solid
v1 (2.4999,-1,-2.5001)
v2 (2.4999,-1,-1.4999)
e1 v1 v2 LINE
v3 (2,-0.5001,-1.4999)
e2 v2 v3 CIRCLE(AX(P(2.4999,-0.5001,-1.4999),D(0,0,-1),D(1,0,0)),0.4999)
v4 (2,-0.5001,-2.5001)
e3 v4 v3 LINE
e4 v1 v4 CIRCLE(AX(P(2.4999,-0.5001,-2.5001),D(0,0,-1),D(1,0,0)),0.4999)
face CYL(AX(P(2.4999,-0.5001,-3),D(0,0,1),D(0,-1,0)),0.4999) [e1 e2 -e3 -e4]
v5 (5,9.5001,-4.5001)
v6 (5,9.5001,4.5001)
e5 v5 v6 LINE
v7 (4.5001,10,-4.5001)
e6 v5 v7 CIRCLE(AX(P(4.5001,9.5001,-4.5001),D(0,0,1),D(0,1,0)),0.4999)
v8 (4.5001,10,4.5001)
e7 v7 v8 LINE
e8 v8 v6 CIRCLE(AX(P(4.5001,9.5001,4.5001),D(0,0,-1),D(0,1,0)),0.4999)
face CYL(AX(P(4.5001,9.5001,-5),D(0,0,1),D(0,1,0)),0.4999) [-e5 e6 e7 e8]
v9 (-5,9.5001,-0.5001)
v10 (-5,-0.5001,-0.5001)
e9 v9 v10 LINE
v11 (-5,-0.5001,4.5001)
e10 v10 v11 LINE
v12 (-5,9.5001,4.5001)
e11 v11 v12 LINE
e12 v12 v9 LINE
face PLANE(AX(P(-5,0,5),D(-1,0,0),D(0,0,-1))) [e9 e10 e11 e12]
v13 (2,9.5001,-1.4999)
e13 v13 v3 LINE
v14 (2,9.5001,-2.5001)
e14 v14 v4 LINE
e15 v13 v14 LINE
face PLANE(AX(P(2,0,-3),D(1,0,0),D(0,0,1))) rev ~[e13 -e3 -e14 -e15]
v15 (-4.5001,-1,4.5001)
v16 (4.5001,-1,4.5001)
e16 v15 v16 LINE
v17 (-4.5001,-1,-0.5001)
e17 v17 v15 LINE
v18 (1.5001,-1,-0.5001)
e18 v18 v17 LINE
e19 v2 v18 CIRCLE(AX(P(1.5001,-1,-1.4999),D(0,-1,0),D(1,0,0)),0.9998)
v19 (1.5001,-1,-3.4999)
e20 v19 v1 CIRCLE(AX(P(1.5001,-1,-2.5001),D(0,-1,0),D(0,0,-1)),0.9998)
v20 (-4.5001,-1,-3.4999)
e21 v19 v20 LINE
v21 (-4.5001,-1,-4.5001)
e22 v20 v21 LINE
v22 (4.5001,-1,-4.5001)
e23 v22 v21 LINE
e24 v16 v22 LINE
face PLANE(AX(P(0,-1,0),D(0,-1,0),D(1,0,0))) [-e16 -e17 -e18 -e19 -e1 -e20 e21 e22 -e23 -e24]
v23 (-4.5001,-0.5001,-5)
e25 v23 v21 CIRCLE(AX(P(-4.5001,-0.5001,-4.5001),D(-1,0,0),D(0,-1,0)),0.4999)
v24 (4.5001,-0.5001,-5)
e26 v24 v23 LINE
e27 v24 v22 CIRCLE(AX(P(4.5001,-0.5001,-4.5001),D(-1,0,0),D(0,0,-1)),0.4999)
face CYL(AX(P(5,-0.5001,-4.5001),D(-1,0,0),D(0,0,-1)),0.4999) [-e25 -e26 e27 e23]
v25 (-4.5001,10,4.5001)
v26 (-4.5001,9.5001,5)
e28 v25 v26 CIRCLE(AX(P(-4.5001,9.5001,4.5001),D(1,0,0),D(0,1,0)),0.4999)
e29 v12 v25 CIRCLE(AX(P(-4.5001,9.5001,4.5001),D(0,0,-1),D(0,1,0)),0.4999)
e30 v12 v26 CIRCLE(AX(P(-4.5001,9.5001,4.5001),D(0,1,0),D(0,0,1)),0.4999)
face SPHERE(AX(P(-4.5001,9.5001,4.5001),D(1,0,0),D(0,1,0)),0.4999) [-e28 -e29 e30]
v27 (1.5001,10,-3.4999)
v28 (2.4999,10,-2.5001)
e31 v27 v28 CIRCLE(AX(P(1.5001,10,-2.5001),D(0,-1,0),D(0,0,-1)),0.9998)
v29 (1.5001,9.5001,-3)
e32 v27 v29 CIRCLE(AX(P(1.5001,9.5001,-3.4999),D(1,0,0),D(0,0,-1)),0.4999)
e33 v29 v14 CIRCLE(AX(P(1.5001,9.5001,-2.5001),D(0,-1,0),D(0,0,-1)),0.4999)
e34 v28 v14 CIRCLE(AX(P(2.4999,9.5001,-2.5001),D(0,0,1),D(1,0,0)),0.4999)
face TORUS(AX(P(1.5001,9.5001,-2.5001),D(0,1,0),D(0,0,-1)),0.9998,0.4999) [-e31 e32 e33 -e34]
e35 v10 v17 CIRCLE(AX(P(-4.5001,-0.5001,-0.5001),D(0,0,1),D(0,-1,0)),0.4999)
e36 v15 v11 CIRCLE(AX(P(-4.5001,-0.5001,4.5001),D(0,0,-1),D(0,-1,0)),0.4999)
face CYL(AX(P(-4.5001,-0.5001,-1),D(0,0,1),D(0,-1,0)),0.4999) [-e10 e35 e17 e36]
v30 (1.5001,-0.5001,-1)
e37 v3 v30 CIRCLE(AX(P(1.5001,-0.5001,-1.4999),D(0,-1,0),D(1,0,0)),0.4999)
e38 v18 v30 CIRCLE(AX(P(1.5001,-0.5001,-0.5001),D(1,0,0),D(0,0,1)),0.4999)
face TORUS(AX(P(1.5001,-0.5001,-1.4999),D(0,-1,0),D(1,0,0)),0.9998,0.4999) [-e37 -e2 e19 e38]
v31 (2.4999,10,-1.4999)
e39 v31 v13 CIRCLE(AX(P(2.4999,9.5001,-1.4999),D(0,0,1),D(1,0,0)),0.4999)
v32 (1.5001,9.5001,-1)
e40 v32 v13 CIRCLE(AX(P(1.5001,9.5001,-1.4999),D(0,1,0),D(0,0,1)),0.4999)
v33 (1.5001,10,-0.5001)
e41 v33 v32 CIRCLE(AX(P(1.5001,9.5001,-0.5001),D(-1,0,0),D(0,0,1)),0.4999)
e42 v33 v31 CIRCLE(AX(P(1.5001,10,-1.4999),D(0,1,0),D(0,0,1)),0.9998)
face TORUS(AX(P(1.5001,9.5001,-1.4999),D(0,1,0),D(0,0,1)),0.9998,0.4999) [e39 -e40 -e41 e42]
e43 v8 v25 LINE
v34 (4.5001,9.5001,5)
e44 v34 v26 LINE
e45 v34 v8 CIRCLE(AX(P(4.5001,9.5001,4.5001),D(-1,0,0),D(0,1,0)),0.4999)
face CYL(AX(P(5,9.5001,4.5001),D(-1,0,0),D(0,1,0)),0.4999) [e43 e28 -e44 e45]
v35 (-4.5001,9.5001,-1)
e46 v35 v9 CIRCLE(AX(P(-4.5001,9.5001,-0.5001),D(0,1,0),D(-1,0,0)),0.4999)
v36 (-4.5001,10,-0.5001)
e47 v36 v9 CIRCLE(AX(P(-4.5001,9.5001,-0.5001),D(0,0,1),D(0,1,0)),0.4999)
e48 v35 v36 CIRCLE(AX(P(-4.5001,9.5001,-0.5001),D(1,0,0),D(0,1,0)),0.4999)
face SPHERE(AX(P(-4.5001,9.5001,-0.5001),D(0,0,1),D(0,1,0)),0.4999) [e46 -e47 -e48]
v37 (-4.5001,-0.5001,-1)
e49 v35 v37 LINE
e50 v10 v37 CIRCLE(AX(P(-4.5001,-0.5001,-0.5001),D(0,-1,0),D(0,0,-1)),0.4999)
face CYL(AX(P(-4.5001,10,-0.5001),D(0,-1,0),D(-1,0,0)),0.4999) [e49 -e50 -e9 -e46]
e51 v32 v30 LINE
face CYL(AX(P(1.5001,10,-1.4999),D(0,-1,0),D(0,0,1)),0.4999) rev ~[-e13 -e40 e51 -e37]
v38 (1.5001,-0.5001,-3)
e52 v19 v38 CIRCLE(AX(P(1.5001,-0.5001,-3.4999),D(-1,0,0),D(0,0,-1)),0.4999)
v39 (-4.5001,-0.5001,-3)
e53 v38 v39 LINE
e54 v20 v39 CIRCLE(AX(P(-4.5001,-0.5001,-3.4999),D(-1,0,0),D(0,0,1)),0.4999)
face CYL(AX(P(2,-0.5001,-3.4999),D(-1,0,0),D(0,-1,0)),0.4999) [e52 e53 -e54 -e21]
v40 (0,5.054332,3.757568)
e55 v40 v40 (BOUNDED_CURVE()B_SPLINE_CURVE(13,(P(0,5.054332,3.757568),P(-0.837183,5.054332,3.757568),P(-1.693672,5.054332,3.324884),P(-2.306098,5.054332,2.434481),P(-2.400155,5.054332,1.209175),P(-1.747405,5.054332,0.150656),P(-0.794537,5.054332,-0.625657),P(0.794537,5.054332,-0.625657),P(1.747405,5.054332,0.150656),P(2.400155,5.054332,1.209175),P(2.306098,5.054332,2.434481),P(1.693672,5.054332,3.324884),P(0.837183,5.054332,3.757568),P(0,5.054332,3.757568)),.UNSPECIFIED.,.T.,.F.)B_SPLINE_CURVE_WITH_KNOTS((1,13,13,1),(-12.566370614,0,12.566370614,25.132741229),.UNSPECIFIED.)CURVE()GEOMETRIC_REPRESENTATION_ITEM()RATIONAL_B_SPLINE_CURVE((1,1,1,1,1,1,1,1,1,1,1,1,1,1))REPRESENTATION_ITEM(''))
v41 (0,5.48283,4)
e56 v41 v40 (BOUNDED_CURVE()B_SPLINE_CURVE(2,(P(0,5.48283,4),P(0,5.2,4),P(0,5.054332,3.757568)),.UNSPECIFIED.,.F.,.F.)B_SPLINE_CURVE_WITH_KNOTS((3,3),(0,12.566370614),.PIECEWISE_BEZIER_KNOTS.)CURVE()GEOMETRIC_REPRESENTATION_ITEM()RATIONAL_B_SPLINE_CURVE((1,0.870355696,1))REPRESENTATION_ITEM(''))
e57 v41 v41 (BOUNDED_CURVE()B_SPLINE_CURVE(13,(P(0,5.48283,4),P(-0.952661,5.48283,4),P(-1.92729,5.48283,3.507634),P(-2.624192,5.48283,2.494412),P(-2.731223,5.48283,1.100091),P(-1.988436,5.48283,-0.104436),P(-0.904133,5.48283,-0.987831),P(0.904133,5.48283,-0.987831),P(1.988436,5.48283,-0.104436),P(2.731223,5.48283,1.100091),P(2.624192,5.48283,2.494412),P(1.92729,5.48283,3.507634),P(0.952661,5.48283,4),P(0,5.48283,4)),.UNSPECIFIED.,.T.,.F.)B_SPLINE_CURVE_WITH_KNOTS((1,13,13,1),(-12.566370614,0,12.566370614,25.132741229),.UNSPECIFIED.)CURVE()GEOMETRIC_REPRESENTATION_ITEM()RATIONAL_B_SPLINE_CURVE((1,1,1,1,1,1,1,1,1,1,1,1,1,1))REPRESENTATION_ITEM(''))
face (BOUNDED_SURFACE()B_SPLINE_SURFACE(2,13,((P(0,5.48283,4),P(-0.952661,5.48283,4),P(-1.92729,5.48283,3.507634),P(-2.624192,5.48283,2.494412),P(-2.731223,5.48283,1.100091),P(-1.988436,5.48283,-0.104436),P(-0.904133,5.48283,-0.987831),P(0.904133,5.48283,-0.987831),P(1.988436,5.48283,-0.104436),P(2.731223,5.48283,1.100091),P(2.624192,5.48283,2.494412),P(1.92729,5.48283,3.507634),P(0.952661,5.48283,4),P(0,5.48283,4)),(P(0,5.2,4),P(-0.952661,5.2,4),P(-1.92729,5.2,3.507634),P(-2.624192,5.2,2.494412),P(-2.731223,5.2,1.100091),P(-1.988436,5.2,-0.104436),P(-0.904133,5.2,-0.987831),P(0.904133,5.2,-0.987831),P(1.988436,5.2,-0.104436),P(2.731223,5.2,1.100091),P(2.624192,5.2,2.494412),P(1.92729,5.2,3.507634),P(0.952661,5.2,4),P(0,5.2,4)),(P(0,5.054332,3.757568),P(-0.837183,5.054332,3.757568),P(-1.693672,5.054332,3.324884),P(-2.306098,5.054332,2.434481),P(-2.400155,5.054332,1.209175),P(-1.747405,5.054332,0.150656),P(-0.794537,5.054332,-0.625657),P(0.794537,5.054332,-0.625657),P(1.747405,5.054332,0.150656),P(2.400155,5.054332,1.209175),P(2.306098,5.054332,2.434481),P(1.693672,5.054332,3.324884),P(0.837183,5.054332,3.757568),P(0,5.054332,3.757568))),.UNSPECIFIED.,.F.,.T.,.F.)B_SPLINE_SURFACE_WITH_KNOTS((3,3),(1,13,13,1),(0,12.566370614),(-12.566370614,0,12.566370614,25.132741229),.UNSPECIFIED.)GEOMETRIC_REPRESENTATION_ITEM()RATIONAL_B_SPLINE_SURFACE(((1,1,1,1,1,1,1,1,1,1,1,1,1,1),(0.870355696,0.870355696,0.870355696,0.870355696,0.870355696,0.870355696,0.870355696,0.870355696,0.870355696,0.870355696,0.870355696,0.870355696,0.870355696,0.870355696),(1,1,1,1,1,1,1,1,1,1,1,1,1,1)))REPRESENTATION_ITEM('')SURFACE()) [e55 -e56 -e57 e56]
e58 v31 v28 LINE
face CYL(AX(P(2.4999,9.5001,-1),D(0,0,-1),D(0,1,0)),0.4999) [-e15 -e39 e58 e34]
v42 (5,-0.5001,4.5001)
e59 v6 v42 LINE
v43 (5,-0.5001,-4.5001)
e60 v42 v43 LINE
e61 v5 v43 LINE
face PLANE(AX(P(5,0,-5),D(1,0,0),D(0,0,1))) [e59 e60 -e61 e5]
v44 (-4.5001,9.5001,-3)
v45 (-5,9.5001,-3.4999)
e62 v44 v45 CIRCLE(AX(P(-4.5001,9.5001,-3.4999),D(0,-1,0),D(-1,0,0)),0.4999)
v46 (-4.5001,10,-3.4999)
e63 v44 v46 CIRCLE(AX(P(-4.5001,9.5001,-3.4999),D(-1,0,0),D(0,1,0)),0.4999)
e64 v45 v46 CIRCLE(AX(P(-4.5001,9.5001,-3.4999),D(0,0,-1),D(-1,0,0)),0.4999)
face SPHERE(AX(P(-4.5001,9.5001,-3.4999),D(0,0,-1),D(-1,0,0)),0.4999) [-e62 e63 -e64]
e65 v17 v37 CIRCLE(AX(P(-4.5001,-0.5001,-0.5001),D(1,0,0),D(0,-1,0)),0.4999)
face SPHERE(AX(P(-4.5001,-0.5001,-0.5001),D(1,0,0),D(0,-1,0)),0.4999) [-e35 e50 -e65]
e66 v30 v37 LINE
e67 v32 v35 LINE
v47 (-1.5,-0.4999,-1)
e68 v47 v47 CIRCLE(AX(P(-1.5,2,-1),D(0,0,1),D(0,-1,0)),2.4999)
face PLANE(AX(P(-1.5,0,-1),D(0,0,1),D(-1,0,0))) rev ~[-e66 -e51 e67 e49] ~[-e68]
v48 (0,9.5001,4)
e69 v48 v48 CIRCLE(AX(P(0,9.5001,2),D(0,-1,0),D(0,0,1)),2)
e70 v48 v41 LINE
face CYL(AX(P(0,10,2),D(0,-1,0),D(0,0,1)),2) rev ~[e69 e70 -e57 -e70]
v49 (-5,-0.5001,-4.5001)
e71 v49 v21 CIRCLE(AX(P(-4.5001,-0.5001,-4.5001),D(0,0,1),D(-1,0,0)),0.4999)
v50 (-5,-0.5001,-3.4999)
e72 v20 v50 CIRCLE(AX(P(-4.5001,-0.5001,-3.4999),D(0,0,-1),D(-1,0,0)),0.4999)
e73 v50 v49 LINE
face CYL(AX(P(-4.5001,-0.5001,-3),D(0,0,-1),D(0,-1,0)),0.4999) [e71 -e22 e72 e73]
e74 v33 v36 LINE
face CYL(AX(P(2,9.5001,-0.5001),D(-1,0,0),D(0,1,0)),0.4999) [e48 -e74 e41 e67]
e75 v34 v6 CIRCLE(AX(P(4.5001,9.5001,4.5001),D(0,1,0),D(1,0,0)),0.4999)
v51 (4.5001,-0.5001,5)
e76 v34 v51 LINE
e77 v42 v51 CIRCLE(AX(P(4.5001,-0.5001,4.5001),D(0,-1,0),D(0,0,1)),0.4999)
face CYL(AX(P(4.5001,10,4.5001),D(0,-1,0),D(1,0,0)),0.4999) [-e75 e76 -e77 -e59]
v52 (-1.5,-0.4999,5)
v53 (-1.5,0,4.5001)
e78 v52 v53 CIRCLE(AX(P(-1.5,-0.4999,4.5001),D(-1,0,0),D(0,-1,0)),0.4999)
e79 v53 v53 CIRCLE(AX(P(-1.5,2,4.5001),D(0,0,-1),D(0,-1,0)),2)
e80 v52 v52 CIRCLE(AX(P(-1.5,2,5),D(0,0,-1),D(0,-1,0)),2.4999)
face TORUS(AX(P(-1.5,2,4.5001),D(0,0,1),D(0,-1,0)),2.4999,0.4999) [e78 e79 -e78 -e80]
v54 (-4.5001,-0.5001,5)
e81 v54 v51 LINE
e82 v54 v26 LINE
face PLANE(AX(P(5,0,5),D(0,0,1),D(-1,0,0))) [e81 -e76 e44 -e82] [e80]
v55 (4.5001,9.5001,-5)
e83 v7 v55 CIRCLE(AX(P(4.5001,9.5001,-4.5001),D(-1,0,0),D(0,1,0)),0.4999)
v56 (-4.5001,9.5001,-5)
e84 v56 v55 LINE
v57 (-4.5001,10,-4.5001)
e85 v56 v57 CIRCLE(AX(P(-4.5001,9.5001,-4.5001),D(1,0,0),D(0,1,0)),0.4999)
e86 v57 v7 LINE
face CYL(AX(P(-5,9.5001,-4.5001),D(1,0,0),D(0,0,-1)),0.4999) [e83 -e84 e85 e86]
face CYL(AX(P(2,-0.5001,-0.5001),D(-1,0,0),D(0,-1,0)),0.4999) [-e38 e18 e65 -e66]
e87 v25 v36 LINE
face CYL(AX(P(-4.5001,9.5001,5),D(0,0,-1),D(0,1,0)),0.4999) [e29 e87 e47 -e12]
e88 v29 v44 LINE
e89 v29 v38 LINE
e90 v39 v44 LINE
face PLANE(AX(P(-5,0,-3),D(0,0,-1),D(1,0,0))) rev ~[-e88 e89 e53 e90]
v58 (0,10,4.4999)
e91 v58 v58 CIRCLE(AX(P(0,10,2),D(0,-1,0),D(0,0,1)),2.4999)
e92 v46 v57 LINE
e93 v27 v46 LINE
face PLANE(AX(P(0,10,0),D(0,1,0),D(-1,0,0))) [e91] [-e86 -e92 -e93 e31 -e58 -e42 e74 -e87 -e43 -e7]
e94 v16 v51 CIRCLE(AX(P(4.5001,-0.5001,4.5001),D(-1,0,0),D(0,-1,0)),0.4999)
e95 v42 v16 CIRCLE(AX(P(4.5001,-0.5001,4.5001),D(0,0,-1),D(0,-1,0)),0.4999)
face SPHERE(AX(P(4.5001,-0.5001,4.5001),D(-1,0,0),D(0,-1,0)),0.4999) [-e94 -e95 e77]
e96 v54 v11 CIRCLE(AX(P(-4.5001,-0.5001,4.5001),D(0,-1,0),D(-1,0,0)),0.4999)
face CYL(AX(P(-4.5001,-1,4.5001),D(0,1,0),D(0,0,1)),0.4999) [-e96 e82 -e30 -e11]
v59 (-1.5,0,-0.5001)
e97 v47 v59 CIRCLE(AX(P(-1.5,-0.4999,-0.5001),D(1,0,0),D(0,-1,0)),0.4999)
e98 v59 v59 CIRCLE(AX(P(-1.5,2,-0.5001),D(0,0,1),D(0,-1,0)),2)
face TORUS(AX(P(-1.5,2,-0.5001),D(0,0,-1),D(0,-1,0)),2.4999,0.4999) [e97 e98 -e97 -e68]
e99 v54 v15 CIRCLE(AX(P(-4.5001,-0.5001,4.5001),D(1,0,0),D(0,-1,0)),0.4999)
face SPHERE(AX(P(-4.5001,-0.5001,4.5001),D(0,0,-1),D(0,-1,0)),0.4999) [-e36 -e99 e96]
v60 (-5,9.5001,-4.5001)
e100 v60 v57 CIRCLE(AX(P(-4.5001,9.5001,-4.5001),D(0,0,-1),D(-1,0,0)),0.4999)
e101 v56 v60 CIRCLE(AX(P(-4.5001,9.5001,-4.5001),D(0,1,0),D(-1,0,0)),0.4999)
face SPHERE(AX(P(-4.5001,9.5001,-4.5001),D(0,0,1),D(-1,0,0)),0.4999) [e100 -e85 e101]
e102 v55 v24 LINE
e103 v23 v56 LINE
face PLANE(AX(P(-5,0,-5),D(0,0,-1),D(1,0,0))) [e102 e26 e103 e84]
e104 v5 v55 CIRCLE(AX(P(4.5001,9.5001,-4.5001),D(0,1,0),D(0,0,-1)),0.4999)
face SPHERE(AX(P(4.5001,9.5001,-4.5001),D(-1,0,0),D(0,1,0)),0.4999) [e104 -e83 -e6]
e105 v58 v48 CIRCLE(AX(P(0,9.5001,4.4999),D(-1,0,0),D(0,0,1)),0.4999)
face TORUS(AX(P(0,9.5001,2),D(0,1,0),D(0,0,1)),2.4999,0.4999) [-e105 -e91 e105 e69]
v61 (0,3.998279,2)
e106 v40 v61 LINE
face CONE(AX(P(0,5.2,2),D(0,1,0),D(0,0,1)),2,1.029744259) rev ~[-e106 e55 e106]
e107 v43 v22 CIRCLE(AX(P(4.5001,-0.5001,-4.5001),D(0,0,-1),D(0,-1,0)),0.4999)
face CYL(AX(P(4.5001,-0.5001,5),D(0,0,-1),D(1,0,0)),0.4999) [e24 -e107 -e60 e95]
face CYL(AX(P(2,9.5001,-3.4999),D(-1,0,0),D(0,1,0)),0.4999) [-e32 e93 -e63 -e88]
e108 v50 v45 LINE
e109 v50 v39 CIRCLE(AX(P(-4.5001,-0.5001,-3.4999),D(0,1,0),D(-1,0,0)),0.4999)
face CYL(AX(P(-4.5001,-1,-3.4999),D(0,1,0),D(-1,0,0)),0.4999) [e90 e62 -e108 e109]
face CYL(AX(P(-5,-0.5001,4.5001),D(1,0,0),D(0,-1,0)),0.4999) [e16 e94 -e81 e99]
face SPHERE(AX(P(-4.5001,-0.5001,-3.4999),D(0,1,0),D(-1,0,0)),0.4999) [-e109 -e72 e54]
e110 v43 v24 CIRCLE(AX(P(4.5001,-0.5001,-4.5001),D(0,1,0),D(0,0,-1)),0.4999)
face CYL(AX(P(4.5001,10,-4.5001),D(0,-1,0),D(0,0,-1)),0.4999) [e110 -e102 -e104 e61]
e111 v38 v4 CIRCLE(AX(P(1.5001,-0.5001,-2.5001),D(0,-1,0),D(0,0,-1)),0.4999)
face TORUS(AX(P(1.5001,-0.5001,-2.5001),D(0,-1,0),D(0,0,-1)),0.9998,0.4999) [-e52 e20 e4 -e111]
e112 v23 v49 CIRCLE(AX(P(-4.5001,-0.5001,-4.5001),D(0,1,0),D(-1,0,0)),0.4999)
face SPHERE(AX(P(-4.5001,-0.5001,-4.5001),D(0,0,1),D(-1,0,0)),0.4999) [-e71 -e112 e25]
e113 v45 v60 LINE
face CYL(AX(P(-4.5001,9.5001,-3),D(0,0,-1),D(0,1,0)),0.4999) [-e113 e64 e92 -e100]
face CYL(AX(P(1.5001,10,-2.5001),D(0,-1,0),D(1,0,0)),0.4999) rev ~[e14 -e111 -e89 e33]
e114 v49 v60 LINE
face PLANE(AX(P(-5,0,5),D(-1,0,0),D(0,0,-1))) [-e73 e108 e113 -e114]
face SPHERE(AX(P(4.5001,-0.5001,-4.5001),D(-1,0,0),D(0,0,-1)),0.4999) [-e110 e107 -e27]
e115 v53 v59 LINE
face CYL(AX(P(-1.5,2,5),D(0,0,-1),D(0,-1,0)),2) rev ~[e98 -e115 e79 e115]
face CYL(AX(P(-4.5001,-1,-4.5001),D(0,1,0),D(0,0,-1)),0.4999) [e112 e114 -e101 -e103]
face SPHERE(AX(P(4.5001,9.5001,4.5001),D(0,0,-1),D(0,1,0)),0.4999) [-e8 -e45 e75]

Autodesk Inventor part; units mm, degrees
ref_plane "YZ Plane" through (0, 0, 0) normal (1, 0, 0) x (0, 1, 0)
ref_plane "XZ Plane" through (0, 0, 0) normal (0, 1, 0) x (-1, 0, 0)
ref_plane "XY Plane" through (0, 0, 0) normal (0, 0, 1) x (1, 0, 0)
sketch "Sk:Base" plane through (0, 0, 0) normal (0, 1, 0) x (-1, 0, 0)
  line L0 (5, -5) -> (-5, -5)
  line L1 (-5, -5) -> (-5, 5)
  line L2 (-5, 5) -> (5, 5)
  line L3 (5, 5) -> (5, -5)
  point P0 (0, 0)
  dimension "d0" = 10
  dimension "d1" = 10
  dimension "d2" = 5
  dimension "d3" = 5
extrude "Ex:Initial" add sketch "Sk:Base" along normal blind 10
sketch "Sk:PostAttach" plane through (0, 10, 0) normal (0, 1, 0) x (1, 0, 0)
  line L0 (5, -5) -> (5, 5) projected
  line L1 (-5, -5) -> (5, -5) projected
  point P0 (0, -2)
  point P1 (0, -2)
  dimension "d30" = 5
  dimension "d31" = 3
hole "Hole:PostAttach" at (0, 10, 2) direction (0, -1, 0) diameter 4 depth 4.8 tip angle 118
sketch "Sk:ProbeSlot1" plane through (0, 0, 0) normal (0, -1, 0) x (1, 0, 0)
  line L0 (5, -5) -> (-5, -5) projected
  line L1 (5, 5) -> (5, -5) projected
  line L2 (-5, -5) -> (5, -5)
  line L3 (5, -5) -> (5, -3)
  line L4 (5, -3) -> (-5, -3)
  line L5 (-5, -3) -> (-5, -5)
  line L6 (5, -3) -> (2, -3)
  line L7 (2, -3) -> (2, -1)
  line L8 (2, -1) -> (5, -1)
  line L9 (5, -1) -> (5, -3)
  line L10 (-5, -5) -> (-5, 5) projected
  line L11 (5, -1) -> (-5, -1)
  line L12 (-5, -1) -> (-5, 5)
  line L13 (-5, 5) -> (5, 5)
  line L14 (5, 5) -> (5, -1)
  point P0 (0, 0)
  dimension "d13" = 2
  dimension "d14" = 3
  dimension "d15" = 2
extrude "Ex:ProbeSlot1" add sketch "Sk:ProbeSlot1" along normal blind 1 contours L0 L5 L4 L1 | L4 L7 L8 L1 | L8 L11 L10 L13 L1
sketch "Sk:FixProbe" plane through (-5, 10, 5) normal (0, 0, 1) x (1, 0, 0)
  line L0 (0, -10) -> (7, -10) projected
  line L1 (0, -10) -> (0, -11) projected
  line L2 (7, -11) -> (0, -11) projected
  line L3 (7, -10) -> (7, -11) projected
  point P0 (5, -10)
  point P1 (3.5, -8)
  dimension "d18" = 7
  dimension "d19" = 3.5
  dimension "d20" = 3
hole "Hole:FixProbe" at (-1.5, 2, 5) direction (0, 0, -1) diameter 4 depth 6 tip angle 118
sketch "Sk:ProbeSlot2" plane through (0, 0, 0) normal (0, -1, 0) x (1, 0, 0)
  line L0 (2, -1) -> (-1.5, -1) projected
  line L1 (-5, -3) -> (-5, -1) projected
  line L2 (-5, -3) -> (2, -3) projected
  line L3 (2, -3) -> (2, -1) projected
  line L4 (-1.5, -1) -> (-1.5, -1) projected
  line L5 (2, -1) -> (-1.5, -1) projected
  line L6 (-5, -3) -> (2, -3)
  line L7 (2, -3) -> (2, -1)
  line L8 (2, -1) -> (-5, -1)
  line L9 (-5, -1) -> (-5, -3)
  point P0 (0, 0)
  point P1 (0.2321, -1)
extrude "Ex:ProbeSlot2" cut sketch "Sk:ProbeSlot2" against normal through all
fillet "Fillet1" radius 0.5 3 edges at (2, 4.5, -3) (2, 4.5, -1) (0, 5.2, 0)
fillet "Fillet1" radius 0.5 25 edges at (-5, 10, -4) (-5, 4.5, -3) (-5, -1, -4) (-5, 4.5, -5) (-1.5, -1, -3) (-1.5, 10, -3) (0, 10, -5) (5, 10, 0) (0, 10, 5) (-5, 10, 2) (-1.5, 10, -1) (2, 10, -2) (0, 10, 0) (0, -1, -5) (5, 4.5, -5) (2, -1, -2) (-1.5, -1, -1) (-5, -1, 2) (0, -1, 5) (5, -1, 0) (5, 4.5, 5) (-5, 4.5, 5) (-1.5, 4, 5) (-5, 4.5, -1) (-1.5, 4, -1)
sketch "Sketch6" plane through (-4.5, 9.5, 5) normal (0, 0, 1) x (1, 0, 0)
  line L0 (9.5, -10.5) -> (-2.3161, -10.5)
  line L1 (-2.3161, -10.5) -> (-2.3161, 1.0498)
  line L2 (-2.3161, 1.0498) -> (9.5, 1.0498)
  line L3 (9.5, 1.0498) -> (9.5, -10.5)
  point P0 (4.5, -9.5)
equation "\"d2\" = 0.5 * d1"
equation "\"d3\" = 0.5 * d0"
equation "\"d19\" = 0.5 * d18"
properties part number "ProbeSharpener"
